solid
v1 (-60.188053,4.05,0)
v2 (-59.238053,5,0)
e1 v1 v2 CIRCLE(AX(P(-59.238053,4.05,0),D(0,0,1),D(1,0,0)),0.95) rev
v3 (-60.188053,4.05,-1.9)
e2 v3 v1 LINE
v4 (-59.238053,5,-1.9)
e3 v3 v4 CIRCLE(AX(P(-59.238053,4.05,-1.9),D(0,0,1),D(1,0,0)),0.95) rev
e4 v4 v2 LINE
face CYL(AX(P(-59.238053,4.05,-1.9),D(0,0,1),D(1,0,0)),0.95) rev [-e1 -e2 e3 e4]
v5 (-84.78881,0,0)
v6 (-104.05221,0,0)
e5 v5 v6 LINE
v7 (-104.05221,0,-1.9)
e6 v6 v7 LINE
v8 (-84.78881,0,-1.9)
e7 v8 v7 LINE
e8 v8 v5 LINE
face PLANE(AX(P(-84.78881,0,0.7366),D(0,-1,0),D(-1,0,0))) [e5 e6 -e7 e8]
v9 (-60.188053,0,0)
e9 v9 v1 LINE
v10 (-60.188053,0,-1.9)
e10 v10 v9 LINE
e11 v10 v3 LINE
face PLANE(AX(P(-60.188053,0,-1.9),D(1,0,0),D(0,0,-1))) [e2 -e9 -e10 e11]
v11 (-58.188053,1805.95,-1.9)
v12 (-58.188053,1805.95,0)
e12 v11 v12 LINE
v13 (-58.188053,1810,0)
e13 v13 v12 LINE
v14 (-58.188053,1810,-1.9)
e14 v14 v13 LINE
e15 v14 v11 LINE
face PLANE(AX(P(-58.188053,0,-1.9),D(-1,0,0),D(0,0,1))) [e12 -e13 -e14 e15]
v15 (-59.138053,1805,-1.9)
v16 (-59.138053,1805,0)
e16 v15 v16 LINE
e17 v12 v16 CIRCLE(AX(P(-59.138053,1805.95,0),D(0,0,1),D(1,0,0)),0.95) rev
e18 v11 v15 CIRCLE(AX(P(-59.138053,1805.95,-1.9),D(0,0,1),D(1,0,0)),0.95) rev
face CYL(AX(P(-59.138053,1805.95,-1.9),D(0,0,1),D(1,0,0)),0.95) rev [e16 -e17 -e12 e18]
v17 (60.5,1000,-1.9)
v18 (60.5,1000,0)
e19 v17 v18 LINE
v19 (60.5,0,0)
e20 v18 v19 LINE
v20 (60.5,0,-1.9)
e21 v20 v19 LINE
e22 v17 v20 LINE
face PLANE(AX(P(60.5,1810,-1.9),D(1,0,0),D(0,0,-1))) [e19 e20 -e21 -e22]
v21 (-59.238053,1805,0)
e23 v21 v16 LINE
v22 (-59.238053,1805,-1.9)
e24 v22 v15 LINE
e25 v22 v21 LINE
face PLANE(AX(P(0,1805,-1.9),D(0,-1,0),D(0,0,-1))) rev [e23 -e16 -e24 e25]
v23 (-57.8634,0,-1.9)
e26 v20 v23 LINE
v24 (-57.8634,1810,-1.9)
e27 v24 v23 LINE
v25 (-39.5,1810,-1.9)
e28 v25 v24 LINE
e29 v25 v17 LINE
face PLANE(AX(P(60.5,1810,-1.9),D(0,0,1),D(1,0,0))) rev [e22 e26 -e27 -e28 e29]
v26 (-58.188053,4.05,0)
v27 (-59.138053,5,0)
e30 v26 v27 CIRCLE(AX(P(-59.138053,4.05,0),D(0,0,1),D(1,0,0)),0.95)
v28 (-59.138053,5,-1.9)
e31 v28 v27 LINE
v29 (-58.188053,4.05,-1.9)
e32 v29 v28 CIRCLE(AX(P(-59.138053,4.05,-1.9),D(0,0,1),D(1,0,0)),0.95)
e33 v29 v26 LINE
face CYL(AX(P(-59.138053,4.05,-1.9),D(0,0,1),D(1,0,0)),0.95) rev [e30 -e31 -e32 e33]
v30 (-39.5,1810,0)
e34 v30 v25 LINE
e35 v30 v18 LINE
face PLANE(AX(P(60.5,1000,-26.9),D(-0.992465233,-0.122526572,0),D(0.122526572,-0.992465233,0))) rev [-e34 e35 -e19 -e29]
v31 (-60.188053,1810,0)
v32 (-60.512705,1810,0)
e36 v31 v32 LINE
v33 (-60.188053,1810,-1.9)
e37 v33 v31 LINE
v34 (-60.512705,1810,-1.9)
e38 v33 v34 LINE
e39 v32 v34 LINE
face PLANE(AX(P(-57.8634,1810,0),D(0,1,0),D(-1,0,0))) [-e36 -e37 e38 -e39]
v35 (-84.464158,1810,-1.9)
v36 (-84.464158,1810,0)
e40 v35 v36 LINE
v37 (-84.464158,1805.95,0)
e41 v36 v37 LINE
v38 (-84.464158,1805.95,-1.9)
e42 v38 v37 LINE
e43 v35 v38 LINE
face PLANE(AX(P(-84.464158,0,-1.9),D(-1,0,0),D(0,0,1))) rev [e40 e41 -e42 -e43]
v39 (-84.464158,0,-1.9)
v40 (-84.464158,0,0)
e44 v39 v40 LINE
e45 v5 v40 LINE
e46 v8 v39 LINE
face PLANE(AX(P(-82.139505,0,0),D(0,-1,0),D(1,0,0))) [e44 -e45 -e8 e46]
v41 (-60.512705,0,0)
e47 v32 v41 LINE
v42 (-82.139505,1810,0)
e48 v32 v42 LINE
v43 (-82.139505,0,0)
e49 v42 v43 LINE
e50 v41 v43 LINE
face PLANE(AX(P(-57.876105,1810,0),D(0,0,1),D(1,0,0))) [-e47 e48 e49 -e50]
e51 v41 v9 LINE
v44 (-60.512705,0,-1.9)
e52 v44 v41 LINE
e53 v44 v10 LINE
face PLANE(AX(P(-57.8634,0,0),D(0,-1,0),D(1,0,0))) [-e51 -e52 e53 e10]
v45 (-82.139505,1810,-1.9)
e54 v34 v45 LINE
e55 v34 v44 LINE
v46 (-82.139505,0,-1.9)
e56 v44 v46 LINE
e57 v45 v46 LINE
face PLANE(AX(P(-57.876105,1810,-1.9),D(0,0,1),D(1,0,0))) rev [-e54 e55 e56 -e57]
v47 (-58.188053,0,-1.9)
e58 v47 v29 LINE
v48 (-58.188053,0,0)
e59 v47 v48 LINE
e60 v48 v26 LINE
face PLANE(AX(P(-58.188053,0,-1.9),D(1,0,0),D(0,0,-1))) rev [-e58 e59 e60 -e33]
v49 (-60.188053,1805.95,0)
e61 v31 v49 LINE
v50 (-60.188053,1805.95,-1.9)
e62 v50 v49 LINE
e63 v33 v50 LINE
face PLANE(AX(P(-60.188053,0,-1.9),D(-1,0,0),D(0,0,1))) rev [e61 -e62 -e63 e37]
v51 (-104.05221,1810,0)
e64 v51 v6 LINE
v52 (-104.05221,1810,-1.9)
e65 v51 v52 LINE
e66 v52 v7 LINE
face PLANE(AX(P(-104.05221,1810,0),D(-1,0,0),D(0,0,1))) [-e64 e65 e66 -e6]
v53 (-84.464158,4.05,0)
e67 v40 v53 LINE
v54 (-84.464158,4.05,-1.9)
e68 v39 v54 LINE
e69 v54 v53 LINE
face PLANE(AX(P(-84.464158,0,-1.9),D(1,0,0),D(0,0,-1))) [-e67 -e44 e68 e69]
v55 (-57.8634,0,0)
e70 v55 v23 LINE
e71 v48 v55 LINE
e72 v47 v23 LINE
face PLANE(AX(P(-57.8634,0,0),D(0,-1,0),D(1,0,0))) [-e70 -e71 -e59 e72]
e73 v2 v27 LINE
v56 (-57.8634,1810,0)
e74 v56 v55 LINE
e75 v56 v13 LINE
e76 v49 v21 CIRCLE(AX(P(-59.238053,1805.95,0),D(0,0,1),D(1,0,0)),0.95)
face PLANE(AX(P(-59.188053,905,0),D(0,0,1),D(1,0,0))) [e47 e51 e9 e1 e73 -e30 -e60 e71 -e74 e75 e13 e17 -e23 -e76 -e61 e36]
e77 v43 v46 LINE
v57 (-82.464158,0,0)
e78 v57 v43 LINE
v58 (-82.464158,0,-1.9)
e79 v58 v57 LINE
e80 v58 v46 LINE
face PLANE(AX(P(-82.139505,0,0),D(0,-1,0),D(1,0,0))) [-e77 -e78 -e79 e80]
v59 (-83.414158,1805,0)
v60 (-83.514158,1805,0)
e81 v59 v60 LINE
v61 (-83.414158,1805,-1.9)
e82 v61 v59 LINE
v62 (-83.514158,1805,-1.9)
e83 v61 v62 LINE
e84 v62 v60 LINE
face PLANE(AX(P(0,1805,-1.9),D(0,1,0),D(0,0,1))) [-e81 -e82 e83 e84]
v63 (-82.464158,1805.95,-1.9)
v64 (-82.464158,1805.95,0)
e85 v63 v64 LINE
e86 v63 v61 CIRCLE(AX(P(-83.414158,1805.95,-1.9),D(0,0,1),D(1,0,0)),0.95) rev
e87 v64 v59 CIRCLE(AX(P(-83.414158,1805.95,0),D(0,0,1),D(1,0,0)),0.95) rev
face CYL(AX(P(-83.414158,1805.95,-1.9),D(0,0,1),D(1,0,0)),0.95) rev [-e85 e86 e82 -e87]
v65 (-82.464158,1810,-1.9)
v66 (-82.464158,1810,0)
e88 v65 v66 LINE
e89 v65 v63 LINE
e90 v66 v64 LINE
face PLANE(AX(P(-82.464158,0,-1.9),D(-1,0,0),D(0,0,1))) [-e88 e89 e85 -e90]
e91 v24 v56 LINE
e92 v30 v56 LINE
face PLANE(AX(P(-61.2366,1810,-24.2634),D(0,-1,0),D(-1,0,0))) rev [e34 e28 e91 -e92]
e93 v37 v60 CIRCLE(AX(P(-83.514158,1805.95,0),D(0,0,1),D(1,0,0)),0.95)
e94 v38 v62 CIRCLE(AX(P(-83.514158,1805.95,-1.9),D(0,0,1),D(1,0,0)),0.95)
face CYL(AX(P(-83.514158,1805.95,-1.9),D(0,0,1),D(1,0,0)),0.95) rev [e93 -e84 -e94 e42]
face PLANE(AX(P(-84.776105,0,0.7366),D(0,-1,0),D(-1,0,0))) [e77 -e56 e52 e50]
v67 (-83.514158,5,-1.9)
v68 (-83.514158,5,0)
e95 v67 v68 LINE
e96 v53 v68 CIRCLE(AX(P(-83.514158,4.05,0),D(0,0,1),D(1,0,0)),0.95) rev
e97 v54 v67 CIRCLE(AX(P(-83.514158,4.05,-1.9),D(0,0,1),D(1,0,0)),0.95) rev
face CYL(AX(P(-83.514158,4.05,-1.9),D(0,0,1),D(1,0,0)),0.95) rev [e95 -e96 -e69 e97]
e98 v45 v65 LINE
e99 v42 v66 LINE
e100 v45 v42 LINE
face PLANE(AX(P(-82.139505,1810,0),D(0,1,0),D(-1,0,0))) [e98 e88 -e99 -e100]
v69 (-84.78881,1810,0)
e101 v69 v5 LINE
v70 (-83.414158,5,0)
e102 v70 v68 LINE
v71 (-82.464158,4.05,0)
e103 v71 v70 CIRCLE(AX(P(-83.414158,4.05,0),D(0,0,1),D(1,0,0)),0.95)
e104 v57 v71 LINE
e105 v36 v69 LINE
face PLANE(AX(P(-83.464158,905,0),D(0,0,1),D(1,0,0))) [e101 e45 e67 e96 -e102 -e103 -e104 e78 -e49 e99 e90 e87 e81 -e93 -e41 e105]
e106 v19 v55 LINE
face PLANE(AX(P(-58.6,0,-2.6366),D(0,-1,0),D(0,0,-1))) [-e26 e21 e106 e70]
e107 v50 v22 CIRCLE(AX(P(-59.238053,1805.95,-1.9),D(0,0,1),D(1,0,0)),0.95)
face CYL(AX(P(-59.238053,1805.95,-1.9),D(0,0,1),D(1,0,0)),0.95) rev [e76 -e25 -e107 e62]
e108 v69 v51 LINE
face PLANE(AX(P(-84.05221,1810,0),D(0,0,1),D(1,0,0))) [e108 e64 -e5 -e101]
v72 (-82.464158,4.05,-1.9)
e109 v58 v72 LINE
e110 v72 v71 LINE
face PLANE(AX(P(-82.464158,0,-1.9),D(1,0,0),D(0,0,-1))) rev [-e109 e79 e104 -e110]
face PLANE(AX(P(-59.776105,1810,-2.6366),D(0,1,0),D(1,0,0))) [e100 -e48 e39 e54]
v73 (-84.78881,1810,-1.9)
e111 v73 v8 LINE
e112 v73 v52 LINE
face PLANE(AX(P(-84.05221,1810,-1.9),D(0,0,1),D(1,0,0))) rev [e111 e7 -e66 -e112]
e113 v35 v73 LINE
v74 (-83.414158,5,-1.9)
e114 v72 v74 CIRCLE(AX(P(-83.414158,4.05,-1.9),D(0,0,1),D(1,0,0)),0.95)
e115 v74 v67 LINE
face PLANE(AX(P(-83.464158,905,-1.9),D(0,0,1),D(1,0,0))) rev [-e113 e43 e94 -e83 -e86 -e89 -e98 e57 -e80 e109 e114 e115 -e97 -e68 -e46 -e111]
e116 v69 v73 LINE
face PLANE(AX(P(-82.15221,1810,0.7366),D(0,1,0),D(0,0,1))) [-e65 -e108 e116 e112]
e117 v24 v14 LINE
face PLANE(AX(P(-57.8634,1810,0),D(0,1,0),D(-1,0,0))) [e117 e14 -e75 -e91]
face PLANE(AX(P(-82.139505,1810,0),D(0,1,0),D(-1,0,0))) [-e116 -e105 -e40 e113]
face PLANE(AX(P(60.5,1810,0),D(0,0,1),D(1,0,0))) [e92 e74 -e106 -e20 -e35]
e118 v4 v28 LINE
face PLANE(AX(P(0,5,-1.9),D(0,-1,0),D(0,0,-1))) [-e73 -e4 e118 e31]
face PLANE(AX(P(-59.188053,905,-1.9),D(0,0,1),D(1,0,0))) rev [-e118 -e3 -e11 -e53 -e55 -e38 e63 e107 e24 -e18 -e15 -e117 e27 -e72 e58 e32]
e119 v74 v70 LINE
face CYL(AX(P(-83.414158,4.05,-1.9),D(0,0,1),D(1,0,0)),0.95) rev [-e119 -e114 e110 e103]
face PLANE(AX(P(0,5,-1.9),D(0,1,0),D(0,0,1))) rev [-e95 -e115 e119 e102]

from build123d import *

# Parameters (mm, degrees)
BRIDA_BASE4_DEPTH          = 1810
CORTAR_EXTRUIR1_DEPTH      = 1812.988923807
CORTAR_EXTRUIR1_DEPTH_BACK = 1812.988923807
DESDOBLAR1_DEPTH           = 1810
DESDOBLAR1_2_DEPTH         = 1810
CORTAR_EXTRUIR2_DEPTH      = 1813.989374608
CORTAR_EXTRUIR2_DEPTH_BACK = 1813.989374608


# Read off the part's stored shape, not the designer's step: Desdoblar1
# Sheet-metal steps are written as plain solids
with BuildPart() as part:
    # Croquis1 → Brida base4 (new body)
    with BuildSketch(Plane(origin=(0, 0, 0), x_dir=(1, 0, 0), z_dir=(0, 1, 0))):
        with BuildLine():
            Line((60.5, 0), (-57.8634, 0))
            ThreePointArc((-57.8634, 0), (-59.727757739, 0.772242261), (-60.5, 2.6366))
            Line((-60.5, 2.6366), (-60.5, 24.2634))
            ThreePointArc((-60.5, 24.2634), (-60.715745145, 24.784254855), (-61.2366, 25))
            Line((-61.2366, 25), (-80.5, 25))
            Line((-80.5, 25), (-80.5, 26.9))
            Line((-80.5, 26.9), (-61.2366, 26.9))
            ThreePointArc((-61.2366, 26.9), (-59.372242261, 26.127757739), (-58.6, 24.2634))
            Line((-58.6, 24.2634), (-58.6, 2.6366))
            ThreePointArc((-58.6, 2.6366), (-58.384254855, 2.115745145), (-57.8634, 1.9))
            Line((-57.8634, 1.9), (60.5, 1.9))
            Line((60.5, 1.9), (60.5, 0))
        make_face()
    extrude(amount=BRIDA_BASE4_DEPTH)

    # Croquis19 → Cortar-Extruir1 (cut, two sides: drawn at the far end of the back side and taken through both)
    with BuildSketch(Plane.XY.offset(-CORTAR_EXTRUIR1_DEPTH_BACK)):
        Polygon((60.5, 1000), (-39.5, 1810), (-39.5, 1900.089959651), (60.5, 1900.089959651), align=None)
    extrude(amount=CORTAR_EXTRUIR1_DEPTH + CORTAR_EXTRUIR1_DEPTH_BACK, mode=Mode.SUBTRACT)

    # Desdoblar1 outline → Desdoblar1 (cut)
    with BuildSketch(Plane(origin=(0, 0, 0), x_dir=(1, 0, 0), z_dir=(0, 1, 0))):
        with BuildLine():
            ThreePointArc((-60.5, 2.6366), (-60.473622072, 2.264578098), (-60.395016084, 1.9))
            Line((-60.395016084, 1.9), (-57.8634, 1.9))
            ThreePointArc((-57.8634, 1.9), (-58.384254855, 2.115745145), (-58.6, 2.6366))
            Line((-58.6, 2.6366), (-58.6, 24.2634))
            ThreePointArc((-58.6, 24.2634), (-59.372242261, 26.127757739), (-61.2366, 26.9))
            Line((-61.2366, 26.9), (-80.5, 26.9))
            Line((-80.5, 26.9), (-80.5, 25))
            Line((-80.5, 25), (-61.2366, 25))
            ThreePointArc((-61.2366, 25), (-60.715745145, 24.784254855), (-60.5, 24.2634))
            Line((-60.5, 24.2634), (-60.5, 2.6366))
        make_face()
    extrude(amount=DESDOBLAR1_DEPTH, mode=Mode.SUBTRACT)

    # Desdoblar1 2 outline → Desdoblar1 2 (add)
    with BuildSketch(Plane(origin=(0, 0, 0), x_dir=(1, 0, 0), z_dir=(0, 1, 0))):
        with BuildLine():
            Line((-104.05221017, 0), (-57.8634, 0))
            ThreePointArc((-57.8634, 0), (-59.446046517, 0.527835063), (-60.395016084, 1.9))
            Line((-60.395016084, 1.9), (-104.05221017, 1.9))
            Line((-104.05221017, 1.9), (-104.05221017, 0))
        make_face()
    extrude(amount=DESDOBLAR1_2_DEPTH)

    # Croquis20 → Cortar-Extruir2 (cut, two sides: drawn at the far end of the back side and taken through both)
    with BuildSketch(Plane.XY.offset(-CORTAR_EXTRUIR2_DEPTH_BACK)):
        with BuildLine():
            ThreePointArc((-82.464157627, 1805.95), (-82.742406185, 1805.278248558), (-83.414157627, 1805))
            Line((-83.414157627, 1805), (-83.514157627, 1805))
            ThreePointArc((-83.514157627, 1805), (-84.185909069, 1805.278248558), (-84.464157627, 1805.95))
            Line((-84.464157627, 1805.95), (-84.464157627, 1810))
            Line((-84.464157627, 1810), (-82.464157627, 1810))
            Line((-82.464157627, 1810), (-82.464157627, 1805.95))
        make_face()
        with BuildLine():
            ThreePointArc((-58.188052542, 1805.95), (-58.4663011, 1805.278248558), (-59.138052542, 1805))
            Line((-59.138052542, 1805), (-59.238052542, 1805))
            ThreePointArc((-59.238052542, 1805), (-59.909803985, 1805.278248558), (-60.188052542, 1805.95))
            Line((-60.188052542, 1805.95), (-60.188052542, 1810))
            Line((-60.188052542, 1810), (-58.188052542, 1810))
            Line((-58.188052542, 1810), (-58.188052542, 1805.95))
        make_face()
        with BuildLine():
            ThreePointArc((-84.464157627, 4.05), (-84.185909069, 4.721751442), (-83.514157627, 5))
            Line((-83.514157627, 5), (-83.414157627, 5))
            ThreePointArc((-83.414157627, 5), (-82.742406185, 4.721751442), (-82.464157627, 4.05))
            Line((-82.464157627, 4.05), (-82.464157627, 0))
            Line((-82.464157627, 0), (-84.464157627, 0))
            Line((-84.464157627, 0), (-84.464157627, 4.05))
        make_face()
        with BuildLine():
            ThreePointArc((-60.188052542, 4.05), (-59.909803985, 4.721751442), (-59.238052542, 5))
            Line((-59.238052542, 5), (-59.138052542, 5))
            ThreePointArc((-59.138052542, 5), (-58.4663011, 4.721751442), (-58.188052542, 4.05))
            Line((-58.188052542, 4.05), (-58.188052542, 0))
            Line((-58.188052542, 0), (-60.188052542, 0))
            Line((-60.188052542, 0), (-60.188052542, 4.05))
        make_face()
    extrude(amount=CORTAR_EXTRUIR2_DEPTH + CORTAR_EXTRUIR2_DEPTH_BACK, mode=Mode.SUBTRACT)


solid = part.part
